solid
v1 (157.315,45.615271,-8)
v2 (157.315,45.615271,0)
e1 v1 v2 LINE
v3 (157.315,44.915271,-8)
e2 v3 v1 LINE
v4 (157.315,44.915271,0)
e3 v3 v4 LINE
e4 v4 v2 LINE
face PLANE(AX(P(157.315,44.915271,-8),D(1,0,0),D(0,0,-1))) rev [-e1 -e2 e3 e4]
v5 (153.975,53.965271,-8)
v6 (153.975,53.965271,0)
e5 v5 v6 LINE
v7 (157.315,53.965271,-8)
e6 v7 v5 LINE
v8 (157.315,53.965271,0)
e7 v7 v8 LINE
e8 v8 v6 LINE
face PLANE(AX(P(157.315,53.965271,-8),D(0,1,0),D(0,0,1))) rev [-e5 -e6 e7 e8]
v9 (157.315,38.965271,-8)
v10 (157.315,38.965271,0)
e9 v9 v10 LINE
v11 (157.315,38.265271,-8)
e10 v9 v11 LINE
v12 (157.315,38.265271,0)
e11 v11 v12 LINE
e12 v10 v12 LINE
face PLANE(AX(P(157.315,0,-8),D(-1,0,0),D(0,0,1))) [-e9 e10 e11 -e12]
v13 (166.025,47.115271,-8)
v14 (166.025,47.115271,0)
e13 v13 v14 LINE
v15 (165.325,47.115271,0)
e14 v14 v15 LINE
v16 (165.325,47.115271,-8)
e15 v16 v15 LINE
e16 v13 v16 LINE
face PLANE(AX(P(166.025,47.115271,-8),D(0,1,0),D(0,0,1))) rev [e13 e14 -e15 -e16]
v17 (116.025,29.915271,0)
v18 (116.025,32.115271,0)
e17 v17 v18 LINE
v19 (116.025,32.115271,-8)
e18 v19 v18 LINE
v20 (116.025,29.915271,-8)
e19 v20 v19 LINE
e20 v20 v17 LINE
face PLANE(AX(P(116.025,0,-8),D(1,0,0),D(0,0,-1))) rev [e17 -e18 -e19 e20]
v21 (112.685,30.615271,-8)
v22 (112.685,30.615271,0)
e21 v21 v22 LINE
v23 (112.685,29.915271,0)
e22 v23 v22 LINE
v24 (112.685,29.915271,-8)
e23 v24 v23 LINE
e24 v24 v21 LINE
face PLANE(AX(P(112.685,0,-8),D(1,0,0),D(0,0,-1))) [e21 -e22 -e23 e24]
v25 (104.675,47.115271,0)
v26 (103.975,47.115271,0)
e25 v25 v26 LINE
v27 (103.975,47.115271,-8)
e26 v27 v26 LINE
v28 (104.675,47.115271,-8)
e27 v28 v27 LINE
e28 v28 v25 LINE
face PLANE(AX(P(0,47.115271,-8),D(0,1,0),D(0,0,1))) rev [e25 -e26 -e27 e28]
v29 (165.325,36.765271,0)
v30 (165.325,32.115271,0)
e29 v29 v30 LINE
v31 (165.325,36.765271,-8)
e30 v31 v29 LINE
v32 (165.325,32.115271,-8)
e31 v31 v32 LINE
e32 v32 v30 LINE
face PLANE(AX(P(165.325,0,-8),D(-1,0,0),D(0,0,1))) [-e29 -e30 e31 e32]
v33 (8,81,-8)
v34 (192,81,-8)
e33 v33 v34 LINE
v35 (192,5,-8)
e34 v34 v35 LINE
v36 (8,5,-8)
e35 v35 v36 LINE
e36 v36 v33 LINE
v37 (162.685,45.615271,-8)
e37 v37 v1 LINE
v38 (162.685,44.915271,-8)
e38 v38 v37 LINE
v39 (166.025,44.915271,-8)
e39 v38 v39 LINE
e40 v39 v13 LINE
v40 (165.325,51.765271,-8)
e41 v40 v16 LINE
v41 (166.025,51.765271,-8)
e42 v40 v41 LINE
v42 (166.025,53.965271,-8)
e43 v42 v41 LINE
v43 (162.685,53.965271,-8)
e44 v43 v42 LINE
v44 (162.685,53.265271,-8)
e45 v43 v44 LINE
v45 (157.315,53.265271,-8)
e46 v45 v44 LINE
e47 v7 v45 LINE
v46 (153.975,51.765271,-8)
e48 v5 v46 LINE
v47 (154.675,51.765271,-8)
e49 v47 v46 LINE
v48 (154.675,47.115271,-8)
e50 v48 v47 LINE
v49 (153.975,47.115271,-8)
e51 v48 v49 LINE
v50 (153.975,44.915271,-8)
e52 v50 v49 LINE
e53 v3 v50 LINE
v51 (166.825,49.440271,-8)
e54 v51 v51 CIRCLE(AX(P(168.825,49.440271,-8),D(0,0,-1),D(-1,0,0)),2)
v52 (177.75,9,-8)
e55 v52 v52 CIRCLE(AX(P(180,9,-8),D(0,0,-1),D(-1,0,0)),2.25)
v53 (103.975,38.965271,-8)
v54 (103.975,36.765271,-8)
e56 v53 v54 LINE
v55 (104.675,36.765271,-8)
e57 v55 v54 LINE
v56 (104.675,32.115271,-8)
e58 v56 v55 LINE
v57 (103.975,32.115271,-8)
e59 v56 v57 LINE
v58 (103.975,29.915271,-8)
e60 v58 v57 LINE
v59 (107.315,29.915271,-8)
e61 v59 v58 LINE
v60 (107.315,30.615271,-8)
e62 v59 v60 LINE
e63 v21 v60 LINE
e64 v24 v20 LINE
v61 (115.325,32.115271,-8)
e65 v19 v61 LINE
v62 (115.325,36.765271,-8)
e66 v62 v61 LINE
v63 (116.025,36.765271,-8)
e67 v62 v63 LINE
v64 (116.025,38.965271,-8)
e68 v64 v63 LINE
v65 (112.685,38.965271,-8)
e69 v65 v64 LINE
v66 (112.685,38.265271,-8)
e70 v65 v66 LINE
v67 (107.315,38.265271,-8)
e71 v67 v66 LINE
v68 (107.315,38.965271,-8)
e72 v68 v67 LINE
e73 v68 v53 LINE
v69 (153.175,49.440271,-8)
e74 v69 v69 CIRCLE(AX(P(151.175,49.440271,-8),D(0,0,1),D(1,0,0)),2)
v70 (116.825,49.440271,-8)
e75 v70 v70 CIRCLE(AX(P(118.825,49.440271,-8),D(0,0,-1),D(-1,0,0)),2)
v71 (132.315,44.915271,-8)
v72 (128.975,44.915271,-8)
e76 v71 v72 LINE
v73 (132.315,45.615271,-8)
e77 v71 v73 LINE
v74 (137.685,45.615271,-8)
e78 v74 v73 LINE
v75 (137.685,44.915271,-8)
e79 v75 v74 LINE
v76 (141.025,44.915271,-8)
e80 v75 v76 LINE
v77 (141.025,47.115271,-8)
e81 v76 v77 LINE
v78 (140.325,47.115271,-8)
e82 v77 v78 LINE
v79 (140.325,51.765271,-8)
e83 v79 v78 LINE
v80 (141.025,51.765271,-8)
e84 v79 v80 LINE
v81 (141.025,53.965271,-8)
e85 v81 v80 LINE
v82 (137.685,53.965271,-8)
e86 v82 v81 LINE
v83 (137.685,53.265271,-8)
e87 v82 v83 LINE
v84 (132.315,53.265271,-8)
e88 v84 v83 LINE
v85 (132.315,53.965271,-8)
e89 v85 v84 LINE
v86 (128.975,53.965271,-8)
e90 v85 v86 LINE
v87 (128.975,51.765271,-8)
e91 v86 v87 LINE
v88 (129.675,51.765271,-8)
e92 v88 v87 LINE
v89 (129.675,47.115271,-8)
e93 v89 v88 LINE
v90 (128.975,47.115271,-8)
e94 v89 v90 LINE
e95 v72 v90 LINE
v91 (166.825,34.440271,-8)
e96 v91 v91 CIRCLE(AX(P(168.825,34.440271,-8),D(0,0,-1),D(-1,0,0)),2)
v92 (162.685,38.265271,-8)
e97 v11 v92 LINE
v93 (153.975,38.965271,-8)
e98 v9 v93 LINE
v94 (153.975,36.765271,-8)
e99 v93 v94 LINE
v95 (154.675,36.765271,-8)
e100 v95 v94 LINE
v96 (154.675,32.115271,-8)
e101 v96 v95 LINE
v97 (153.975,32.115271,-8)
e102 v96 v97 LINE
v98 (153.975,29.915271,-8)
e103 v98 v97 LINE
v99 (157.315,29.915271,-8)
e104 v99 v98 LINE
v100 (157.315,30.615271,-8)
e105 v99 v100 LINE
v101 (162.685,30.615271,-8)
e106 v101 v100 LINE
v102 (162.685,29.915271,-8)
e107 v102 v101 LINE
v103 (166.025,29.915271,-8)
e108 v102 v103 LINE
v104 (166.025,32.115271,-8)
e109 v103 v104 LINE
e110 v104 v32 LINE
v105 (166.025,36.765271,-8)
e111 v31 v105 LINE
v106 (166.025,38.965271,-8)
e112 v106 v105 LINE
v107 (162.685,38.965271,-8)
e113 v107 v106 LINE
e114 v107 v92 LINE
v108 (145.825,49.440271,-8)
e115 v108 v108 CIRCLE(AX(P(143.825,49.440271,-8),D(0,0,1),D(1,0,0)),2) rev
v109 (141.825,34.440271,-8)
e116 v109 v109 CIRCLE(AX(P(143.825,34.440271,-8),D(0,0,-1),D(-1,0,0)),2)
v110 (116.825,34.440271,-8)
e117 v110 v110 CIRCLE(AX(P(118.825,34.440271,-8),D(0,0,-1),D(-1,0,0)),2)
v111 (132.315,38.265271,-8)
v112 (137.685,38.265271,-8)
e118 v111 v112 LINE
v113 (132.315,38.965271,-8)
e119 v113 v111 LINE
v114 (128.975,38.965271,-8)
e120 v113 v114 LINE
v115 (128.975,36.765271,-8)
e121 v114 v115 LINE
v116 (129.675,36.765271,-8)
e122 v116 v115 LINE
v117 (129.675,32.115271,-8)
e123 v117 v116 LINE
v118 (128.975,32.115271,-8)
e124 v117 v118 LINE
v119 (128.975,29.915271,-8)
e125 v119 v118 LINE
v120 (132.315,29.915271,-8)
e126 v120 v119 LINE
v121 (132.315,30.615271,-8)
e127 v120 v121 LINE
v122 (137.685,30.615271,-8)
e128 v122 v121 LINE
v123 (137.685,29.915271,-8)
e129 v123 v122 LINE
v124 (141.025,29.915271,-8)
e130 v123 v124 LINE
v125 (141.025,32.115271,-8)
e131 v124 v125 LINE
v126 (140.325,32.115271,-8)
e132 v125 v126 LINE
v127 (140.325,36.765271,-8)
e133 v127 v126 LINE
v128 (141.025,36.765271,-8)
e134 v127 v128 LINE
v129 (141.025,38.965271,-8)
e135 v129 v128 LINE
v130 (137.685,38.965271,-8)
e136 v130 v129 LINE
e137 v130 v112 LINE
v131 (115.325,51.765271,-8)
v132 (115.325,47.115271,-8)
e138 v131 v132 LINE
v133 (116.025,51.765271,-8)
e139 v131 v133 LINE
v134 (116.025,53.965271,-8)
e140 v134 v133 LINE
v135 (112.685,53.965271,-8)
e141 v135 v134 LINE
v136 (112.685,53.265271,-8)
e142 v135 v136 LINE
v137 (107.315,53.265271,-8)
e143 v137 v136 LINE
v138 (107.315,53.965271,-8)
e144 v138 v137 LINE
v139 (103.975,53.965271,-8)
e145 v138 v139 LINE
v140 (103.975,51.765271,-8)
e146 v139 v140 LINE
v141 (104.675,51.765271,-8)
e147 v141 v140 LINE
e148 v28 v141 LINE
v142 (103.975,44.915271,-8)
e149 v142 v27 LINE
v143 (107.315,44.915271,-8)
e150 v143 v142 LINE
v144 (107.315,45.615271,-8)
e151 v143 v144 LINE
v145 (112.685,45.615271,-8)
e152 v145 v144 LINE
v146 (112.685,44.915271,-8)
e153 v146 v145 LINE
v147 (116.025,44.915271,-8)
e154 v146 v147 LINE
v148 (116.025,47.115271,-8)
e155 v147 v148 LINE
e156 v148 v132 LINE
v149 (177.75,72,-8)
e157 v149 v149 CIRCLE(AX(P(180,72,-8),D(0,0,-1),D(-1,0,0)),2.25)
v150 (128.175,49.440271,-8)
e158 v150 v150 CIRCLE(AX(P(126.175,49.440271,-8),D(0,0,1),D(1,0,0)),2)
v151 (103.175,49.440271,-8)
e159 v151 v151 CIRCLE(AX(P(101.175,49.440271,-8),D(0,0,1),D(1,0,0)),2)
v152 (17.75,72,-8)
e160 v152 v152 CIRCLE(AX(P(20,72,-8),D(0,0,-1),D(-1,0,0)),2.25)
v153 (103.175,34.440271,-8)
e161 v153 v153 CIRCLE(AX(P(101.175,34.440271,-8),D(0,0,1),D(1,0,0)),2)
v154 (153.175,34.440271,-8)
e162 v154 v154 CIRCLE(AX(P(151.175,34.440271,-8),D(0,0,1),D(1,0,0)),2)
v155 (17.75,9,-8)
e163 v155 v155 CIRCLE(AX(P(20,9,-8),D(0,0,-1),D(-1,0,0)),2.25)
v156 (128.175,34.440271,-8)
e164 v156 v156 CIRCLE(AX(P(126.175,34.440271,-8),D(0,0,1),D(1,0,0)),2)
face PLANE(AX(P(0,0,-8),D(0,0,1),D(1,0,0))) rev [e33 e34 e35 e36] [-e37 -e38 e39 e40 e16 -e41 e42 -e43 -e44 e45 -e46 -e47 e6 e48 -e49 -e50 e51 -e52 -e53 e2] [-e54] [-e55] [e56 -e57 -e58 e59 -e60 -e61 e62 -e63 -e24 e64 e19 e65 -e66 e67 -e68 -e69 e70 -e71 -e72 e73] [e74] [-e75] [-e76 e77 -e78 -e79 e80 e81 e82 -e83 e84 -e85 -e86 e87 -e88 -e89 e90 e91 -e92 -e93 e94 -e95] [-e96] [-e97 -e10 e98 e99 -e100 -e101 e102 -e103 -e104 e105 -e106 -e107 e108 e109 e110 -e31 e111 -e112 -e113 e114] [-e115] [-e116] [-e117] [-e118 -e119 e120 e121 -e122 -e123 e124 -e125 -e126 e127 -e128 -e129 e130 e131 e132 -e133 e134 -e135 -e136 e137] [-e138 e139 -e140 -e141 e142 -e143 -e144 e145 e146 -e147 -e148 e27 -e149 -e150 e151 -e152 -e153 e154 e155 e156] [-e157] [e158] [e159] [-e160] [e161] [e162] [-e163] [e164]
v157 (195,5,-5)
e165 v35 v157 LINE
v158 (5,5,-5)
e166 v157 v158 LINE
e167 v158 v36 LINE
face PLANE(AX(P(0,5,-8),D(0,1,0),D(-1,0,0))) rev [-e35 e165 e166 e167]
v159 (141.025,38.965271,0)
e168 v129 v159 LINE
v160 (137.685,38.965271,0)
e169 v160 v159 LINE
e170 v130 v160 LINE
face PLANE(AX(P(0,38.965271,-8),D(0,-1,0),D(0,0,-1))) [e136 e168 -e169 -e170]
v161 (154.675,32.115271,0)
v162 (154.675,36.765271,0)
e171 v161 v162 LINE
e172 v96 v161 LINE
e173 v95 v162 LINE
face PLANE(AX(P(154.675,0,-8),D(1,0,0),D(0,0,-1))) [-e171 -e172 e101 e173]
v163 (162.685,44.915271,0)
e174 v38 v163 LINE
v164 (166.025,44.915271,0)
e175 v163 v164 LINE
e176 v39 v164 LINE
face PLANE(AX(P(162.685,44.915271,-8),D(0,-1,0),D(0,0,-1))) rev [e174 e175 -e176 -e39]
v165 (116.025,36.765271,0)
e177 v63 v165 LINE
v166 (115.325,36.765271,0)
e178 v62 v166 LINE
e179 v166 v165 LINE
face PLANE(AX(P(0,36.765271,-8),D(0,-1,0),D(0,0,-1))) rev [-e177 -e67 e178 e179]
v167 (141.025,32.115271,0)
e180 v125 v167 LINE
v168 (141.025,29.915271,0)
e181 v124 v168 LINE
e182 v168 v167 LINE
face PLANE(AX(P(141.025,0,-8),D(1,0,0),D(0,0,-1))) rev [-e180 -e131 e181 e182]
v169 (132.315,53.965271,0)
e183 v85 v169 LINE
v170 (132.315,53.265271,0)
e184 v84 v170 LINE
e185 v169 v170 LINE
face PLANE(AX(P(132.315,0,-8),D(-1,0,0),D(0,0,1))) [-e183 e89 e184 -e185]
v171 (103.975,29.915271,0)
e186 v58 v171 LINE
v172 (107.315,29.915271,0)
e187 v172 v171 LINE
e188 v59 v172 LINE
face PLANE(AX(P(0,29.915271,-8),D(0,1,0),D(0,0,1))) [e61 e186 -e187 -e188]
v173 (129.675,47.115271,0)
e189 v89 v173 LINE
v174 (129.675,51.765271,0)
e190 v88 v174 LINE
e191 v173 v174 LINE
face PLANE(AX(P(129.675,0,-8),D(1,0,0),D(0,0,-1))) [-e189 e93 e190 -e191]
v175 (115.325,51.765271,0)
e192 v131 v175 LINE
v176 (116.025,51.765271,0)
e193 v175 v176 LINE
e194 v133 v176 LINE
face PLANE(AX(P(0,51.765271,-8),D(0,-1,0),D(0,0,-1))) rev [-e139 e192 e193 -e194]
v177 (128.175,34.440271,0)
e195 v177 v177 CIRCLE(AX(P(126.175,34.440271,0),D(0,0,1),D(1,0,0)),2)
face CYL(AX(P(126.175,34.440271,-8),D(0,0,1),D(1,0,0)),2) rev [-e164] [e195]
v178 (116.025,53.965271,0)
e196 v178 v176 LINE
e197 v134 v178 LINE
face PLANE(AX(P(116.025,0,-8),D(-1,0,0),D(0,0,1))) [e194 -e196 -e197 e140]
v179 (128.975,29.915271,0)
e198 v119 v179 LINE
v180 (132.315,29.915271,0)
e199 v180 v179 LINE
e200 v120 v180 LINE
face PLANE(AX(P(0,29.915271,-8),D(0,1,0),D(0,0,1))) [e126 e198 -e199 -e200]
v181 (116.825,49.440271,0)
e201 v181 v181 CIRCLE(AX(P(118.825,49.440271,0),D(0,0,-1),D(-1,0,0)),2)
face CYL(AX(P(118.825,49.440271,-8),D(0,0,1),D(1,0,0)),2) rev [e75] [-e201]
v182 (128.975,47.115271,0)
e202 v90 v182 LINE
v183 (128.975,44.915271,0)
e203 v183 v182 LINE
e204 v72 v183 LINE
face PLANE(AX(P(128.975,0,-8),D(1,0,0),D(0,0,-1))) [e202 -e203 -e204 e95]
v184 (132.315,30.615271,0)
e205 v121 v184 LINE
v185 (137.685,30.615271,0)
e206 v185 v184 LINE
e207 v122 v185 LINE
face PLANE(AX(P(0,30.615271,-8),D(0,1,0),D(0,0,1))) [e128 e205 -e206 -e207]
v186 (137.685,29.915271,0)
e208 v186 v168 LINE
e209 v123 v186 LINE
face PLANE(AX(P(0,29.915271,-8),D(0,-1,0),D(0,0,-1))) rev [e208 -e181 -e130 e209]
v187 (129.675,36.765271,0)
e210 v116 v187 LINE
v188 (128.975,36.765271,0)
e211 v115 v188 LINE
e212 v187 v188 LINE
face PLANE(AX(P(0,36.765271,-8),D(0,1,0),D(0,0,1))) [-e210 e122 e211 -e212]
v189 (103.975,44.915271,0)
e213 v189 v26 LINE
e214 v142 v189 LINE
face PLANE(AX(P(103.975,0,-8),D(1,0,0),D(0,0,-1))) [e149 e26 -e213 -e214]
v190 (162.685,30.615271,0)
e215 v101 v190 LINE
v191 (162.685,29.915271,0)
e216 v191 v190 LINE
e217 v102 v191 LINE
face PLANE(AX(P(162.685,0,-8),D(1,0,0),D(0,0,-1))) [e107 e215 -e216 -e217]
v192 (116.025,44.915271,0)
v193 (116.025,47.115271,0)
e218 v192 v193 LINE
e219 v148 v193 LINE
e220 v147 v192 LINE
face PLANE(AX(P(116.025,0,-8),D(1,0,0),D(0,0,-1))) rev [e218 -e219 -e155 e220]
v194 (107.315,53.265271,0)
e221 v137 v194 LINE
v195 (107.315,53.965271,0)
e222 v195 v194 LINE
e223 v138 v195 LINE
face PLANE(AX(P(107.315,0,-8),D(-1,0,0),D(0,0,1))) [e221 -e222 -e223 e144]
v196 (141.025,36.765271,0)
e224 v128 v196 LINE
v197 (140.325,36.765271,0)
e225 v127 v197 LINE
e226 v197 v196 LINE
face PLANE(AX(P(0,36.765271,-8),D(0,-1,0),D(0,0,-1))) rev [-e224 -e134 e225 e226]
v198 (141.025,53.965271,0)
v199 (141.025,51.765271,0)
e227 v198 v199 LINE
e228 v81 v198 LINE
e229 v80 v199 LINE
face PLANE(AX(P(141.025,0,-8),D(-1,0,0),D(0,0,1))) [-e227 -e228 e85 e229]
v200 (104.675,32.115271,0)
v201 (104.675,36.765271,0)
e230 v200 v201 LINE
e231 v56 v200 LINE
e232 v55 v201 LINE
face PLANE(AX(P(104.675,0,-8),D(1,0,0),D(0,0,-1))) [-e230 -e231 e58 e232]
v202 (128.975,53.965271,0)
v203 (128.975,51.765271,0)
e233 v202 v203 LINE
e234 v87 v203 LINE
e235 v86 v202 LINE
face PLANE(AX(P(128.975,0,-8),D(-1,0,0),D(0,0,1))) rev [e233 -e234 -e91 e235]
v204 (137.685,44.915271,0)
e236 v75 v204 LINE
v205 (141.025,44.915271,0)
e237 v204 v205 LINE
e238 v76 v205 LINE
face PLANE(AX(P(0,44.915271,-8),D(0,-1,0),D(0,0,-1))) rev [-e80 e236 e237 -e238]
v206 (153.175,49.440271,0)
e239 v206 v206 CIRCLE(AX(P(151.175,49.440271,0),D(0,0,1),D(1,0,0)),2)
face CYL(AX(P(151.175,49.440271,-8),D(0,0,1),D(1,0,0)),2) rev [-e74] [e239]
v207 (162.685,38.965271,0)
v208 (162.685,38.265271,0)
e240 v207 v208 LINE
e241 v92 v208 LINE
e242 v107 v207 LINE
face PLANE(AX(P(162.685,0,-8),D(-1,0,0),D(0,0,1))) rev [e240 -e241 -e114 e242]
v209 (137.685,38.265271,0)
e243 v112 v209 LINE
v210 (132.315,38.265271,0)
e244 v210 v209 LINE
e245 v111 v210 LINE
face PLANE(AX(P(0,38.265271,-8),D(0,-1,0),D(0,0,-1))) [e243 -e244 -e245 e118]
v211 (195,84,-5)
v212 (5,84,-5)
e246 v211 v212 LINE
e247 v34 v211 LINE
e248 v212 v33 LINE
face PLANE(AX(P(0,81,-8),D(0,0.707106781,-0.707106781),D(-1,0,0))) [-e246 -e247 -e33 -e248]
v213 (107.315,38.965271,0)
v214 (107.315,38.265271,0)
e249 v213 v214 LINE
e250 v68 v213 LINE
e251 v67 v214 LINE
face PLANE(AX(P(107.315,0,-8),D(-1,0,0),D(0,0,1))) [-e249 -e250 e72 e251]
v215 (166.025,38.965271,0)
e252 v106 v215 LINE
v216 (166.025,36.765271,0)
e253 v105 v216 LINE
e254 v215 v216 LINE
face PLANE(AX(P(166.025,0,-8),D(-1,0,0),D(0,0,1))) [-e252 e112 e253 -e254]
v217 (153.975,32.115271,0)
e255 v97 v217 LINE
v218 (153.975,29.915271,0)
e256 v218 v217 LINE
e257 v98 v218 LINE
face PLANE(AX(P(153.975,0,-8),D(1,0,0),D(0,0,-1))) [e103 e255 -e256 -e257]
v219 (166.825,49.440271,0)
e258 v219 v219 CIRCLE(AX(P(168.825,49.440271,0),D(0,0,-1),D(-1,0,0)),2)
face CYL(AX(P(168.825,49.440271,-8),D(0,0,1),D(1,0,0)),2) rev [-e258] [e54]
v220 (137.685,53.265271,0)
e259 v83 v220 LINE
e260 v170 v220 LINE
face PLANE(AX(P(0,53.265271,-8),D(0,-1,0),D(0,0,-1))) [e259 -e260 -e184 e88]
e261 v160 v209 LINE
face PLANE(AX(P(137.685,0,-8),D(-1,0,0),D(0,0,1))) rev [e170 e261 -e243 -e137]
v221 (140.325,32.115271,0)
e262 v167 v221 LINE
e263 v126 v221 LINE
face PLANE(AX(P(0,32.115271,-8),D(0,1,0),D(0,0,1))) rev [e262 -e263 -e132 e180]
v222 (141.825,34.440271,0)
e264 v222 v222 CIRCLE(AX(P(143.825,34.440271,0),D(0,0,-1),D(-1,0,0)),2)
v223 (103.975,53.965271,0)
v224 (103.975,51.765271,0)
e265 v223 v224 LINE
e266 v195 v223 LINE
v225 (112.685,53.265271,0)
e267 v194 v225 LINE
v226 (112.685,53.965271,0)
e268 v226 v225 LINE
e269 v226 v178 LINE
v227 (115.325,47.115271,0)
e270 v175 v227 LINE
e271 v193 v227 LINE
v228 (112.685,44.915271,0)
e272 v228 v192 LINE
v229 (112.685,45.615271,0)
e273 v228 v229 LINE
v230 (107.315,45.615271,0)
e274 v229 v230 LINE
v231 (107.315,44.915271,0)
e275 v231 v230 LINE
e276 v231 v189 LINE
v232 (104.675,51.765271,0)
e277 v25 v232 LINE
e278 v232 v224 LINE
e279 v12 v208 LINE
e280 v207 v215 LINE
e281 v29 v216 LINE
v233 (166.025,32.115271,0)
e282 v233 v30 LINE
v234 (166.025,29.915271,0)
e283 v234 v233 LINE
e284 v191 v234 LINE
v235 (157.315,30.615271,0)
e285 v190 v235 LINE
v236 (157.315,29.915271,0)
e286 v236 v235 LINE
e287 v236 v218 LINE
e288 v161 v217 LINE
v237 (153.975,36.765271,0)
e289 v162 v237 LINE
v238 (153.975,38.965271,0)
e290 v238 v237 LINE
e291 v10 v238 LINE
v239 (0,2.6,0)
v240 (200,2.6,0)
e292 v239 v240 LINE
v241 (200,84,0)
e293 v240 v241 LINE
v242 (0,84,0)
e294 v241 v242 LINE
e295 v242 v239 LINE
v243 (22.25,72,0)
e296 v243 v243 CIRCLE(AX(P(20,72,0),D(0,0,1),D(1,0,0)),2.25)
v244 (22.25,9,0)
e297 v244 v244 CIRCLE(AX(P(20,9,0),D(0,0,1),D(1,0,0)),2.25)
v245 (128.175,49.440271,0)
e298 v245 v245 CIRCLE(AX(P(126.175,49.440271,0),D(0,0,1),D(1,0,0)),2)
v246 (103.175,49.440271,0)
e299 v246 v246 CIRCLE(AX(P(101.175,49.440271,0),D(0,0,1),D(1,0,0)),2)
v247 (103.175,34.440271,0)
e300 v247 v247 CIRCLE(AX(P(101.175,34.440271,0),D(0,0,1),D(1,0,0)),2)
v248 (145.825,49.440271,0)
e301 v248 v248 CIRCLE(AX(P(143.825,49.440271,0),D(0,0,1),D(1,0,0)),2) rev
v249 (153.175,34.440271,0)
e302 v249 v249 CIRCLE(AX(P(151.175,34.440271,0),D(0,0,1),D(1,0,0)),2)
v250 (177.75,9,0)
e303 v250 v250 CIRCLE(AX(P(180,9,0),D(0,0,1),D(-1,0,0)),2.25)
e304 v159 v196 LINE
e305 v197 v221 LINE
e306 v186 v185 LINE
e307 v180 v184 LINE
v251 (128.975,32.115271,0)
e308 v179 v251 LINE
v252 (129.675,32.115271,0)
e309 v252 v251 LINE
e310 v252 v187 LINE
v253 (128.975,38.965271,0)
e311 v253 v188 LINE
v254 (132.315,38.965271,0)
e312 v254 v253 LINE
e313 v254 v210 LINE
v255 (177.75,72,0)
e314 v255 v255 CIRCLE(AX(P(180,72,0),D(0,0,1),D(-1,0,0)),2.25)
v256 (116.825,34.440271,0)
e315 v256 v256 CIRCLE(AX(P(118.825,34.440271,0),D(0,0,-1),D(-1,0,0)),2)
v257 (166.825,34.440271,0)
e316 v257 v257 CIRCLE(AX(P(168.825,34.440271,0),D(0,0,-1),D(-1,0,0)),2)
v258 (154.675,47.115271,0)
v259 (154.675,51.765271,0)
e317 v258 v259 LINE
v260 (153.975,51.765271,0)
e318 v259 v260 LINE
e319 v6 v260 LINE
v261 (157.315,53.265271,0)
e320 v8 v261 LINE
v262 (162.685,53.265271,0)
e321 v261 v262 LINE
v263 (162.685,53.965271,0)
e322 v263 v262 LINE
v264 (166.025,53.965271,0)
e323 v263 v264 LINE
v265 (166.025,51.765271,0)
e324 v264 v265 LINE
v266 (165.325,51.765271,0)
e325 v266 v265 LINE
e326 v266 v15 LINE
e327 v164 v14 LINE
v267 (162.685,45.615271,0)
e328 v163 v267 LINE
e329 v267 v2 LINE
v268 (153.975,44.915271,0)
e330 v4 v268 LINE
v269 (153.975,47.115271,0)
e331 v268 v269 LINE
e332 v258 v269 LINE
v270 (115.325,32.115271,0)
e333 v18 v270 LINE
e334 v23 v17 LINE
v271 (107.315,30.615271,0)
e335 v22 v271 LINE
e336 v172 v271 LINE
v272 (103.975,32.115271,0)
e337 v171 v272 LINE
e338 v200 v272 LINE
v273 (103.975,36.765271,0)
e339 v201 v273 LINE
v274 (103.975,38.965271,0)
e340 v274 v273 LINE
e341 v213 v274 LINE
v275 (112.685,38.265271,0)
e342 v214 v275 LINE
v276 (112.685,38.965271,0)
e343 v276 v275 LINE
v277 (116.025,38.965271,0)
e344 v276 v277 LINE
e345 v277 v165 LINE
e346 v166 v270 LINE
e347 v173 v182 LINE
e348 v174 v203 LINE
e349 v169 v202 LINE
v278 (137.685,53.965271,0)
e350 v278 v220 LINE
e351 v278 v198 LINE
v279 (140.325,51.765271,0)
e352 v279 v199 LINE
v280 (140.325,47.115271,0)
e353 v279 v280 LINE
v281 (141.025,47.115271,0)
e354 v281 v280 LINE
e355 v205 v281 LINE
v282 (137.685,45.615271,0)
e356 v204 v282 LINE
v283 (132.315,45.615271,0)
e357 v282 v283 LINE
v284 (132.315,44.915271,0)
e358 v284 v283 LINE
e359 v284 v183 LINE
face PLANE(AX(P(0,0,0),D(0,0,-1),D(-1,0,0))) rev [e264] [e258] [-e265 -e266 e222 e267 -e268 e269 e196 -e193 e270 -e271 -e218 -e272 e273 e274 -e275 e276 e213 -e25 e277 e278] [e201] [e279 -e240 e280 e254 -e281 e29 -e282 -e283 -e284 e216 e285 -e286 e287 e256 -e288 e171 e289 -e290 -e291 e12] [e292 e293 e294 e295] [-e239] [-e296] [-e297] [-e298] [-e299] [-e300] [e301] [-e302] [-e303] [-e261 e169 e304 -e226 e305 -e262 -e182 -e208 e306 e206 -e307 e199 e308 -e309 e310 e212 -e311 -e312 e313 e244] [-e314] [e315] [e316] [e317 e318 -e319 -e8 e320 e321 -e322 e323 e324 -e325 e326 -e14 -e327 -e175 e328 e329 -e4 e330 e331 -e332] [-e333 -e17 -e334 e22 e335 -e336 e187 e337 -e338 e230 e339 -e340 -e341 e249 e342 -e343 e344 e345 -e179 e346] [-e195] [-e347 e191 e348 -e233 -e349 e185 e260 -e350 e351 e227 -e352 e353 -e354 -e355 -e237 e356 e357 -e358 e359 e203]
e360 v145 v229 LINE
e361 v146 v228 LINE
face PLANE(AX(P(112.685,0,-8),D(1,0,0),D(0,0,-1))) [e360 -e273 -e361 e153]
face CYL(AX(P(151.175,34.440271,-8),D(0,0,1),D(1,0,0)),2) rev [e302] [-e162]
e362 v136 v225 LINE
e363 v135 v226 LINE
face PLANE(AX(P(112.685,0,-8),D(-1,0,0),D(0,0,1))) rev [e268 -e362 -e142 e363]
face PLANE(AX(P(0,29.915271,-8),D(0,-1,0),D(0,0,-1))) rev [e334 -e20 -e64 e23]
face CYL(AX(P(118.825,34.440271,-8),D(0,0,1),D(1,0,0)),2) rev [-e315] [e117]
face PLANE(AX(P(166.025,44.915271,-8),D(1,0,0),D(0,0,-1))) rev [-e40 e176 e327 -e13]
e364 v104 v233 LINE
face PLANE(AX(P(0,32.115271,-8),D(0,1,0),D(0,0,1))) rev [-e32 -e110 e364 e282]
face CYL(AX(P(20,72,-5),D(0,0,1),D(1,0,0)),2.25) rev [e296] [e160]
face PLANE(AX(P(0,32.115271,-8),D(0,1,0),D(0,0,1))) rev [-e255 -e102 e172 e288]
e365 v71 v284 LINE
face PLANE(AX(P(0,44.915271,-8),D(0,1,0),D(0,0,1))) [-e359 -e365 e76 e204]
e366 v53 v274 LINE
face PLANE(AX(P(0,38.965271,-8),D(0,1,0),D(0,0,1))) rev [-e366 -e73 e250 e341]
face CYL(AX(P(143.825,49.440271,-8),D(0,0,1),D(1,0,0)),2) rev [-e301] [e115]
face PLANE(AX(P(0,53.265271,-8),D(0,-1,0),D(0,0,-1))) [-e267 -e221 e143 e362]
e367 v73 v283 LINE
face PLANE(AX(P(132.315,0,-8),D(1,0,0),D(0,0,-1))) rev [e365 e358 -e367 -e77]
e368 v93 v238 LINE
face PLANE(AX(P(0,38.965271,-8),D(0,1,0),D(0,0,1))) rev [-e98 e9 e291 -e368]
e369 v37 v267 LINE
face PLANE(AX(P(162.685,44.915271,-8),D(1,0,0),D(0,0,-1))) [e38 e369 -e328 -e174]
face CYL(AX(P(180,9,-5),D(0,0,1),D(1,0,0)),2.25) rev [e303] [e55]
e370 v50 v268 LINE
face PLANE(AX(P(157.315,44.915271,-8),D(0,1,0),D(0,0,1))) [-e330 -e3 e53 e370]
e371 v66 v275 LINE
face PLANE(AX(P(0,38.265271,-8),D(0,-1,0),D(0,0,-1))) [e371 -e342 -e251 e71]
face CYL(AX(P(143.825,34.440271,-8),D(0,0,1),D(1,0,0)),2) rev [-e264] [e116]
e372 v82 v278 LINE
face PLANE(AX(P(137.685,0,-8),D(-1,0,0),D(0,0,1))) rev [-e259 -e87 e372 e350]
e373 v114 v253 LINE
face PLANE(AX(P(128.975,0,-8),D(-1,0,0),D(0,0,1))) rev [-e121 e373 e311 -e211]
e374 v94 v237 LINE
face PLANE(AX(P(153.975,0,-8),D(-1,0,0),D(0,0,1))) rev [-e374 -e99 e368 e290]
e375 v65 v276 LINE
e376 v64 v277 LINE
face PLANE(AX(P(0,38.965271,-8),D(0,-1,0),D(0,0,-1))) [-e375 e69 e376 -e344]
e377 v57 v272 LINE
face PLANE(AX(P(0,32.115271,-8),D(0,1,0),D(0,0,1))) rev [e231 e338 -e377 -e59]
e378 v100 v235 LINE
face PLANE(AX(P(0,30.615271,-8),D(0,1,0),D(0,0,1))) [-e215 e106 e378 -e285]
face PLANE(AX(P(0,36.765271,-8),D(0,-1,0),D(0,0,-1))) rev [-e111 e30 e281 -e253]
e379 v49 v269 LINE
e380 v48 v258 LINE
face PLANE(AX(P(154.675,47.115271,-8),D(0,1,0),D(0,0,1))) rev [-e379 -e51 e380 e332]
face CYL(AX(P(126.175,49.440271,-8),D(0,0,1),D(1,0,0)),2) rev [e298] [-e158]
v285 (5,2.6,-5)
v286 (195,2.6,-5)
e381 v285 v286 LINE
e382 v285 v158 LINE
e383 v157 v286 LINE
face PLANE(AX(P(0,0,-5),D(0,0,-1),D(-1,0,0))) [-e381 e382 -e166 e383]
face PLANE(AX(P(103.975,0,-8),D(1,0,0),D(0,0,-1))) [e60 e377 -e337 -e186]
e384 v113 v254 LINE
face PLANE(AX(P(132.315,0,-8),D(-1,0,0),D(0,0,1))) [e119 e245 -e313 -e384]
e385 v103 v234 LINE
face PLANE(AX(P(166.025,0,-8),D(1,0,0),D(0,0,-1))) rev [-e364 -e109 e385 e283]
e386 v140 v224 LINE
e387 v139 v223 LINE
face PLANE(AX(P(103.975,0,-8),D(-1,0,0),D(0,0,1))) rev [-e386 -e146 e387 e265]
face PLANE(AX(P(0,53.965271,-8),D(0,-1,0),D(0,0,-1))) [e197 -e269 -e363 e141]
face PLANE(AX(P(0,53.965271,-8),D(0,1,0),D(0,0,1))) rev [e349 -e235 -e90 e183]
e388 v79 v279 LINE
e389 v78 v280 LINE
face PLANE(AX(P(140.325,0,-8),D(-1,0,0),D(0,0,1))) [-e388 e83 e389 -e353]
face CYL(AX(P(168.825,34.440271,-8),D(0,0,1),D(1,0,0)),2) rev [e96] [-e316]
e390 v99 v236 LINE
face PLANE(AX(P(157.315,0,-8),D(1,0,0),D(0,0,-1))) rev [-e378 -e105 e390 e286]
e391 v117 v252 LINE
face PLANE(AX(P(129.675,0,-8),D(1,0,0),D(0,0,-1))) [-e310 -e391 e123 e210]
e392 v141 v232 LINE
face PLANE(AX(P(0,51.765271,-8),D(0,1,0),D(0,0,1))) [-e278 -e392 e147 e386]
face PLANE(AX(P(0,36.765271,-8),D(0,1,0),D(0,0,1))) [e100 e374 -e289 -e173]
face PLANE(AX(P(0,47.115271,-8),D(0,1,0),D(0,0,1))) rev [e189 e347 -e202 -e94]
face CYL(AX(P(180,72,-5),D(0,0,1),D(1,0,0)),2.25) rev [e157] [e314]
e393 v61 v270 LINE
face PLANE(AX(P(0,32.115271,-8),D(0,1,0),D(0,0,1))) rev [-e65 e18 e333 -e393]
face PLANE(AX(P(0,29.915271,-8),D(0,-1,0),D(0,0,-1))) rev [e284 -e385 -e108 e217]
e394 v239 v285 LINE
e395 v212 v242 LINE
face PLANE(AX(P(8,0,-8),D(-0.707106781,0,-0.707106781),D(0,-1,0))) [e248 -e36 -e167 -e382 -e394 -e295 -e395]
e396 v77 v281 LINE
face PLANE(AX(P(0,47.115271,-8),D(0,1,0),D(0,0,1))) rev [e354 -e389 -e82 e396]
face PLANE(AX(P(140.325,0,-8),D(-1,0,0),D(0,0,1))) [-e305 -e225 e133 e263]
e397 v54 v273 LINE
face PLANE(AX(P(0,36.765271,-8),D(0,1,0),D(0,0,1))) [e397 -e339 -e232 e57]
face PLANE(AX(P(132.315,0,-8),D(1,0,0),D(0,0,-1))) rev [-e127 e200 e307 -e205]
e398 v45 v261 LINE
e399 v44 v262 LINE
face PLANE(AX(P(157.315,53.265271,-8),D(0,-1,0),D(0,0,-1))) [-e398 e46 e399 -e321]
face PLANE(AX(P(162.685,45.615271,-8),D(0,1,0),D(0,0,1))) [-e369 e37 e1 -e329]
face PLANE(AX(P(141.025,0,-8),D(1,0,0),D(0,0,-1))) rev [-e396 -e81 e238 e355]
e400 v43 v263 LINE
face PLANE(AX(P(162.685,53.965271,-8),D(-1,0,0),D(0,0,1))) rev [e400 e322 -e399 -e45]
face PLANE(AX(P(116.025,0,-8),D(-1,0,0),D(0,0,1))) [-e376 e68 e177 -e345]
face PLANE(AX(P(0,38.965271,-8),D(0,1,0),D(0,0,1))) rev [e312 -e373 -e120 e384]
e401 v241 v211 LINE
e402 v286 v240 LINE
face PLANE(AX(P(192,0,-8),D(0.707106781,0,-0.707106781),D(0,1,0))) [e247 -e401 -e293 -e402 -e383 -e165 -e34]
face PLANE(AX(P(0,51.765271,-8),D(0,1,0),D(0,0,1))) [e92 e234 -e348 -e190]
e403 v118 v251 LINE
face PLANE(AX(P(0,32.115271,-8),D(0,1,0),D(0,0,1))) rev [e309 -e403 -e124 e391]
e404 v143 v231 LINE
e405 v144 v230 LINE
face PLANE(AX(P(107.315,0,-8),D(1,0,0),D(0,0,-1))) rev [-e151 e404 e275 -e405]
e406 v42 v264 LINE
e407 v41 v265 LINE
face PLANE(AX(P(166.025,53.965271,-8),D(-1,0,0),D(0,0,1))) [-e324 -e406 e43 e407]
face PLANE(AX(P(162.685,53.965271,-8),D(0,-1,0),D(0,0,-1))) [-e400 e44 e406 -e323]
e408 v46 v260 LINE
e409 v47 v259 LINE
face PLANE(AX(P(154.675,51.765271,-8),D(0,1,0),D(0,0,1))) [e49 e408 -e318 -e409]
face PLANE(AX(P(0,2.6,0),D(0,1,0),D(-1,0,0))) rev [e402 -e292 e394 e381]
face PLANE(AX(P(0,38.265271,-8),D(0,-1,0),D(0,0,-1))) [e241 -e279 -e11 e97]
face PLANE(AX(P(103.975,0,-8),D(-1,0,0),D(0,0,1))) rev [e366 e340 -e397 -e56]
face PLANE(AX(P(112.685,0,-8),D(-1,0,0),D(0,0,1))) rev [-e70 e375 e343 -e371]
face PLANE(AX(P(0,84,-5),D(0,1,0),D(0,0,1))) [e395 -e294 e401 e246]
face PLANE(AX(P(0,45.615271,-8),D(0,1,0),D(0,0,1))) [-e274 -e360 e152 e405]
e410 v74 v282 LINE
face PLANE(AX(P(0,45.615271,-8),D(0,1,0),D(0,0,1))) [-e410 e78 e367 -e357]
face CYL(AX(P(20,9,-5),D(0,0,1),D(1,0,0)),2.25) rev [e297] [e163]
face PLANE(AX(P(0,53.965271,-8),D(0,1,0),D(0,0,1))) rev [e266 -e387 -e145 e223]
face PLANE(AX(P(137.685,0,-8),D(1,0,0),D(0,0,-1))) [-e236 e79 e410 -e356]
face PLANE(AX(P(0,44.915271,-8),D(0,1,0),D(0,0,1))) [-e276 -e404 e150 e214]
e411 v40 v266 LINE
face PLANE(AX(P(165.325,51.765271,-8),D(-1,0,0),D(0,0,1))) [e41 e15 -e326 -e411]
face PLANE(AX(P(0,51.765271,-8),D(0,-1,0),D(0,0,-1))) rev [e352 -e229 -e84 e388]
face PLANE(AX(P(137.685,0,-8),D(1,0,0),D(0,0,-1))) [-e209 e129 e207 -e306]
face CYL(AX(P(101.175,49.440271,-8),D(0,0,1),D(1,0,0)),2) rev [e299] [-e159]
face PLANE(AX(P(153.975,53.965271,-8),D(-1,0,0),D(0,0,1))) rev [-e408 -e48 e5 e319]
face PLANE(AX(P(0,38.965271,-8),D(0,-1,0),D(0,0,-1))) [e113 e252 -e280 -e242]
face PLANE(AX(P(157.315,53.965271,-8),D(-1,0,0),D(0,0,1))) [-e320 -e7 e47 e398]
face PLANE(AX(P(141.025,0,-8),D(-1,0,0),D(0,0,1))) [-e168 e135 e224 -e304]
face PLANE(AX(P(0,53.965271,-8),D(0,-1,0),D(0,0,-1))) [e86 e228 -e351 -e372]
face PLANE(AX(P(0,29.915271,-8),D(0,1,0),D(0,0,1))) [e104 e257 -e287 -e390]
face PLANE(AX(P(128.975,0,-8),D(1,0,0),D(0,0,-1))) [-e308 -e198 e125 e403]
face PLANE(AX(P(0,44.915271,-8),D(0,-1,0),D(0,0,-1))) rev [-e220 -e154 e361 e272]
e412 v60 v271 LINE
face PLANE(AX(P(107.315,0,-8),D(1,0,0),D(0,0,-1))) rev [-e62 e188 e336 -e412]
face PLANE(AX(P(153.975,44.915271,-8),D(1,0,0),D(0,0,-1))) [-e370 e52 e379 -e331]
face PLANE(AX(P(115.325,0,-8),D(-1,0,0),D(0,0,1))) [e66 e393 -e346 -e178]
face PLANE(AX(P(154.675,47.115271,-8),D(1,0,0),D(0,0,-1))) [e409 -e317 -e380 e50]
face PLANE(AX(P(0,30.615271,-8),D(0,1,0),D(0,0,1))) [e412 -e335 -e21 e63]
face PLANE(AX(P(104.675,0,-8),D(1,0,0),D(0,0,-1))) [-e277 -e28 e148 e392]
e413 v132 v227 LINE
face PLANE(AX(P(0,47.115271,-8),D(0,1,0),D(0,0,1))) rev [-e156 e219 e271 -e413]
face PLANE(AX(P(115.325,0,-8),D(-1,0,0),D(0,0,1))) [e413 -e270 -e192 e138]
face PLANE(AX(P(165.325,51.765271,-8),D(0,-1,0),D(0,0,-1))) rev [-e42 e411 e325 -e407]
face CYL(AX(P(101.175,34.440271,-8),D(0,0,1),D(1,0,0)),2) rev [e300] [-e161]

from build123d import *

# Parameters (mm, degrees)
SKETCH1_W           = 200
SKETCH1_H           = 84
SKETCH1_R           = 2.25
BOSS_EXTRUDE1_DEPTH = 5
SKETCH2_W           = 200
SKETCH2_H           = 79
SKETCH2_R           = 2.25
BOSS_EXTRUDE2_DEPTH = 3
CHAMFER1_SIZE       = 8
CHAMFER3_SIZE       = 3
SKETCH3_W           = 7.071067812
SKETCH3_H           = 2.6
CUT_EXTRUDE1_DEPTH  = 234.034075139
SKETCH4_R           = 2
CUT_EXTRUDE3_DEPTH  = 218.071416819


with BuildPart() as part:
    # Sketch1 → Boss-Extrude1 (new body)
    with BuildSketch(Plane.XY):
        with Locations((100, 42)):
            Rectangle(SKETCH1_W, SKETCH1_H)
        with Locations((20, 9)):
            Circle(SKETCH1_R, mode=Mode.SUBTRACT)
        with Locations(Location((180, 9, 0), (0, 0, 180))):
            Circle(SKETCH1_R, mode=Mode.SUBTRACT)
        with Locations((20, 72)):
            Circle(SKETCH1_R, mode=Mode.SUBTRACT)
        with Locations(Location((180, 72, 0), (0, 0, 180))):
            Circle(SKETCH1_R, mode=Mode.SUBTRACT)
    extrude(amount=-BOSS_EXTRUDE1_DEPTH)

    # Sketch2 → Boss-Extrude2 (add)
    with BuildSketch(Plane(origin=(0, 0, -5), x_dir=(-1, 0, 0), z_dir=(0, 0, -1))):
        with Locations((-100, 44.5)):
            Rectangle(SKETCH2_W, SKETCH2_H)
        with Locations(Location((-20, 9, 0), (0, 0, 180))):
            Circle(SKETCH2_R, mode=Mode.SUBTRACT)
        with Locations((-180, 9)):
            Circle(SKETCH2_R, mode=Mode.SUBTRACT)
        with Locations(Location((-20, 72, 0), (0, 0, 180))):
            Circle(SKETCH2_R, mode=Mode.SUBTRACT)
        with Locations((-180, 72)):
            Circle(SKETCH2_R, mode=Mode.SUBTRACT)
    extrude(amount=BOSS_EXTRUDE2_DEPTH)

    # Chamfer1
    # the kernel refuses this chamfer: 8 mm, written as the material it takes off along each edge
    with BuildSketch(Plane(origin=(200, -15.573463904, -8), x_dir=(-0.9996219169112968, 0, -0.027495876610586296), z_dir=(0, 1, 0)), Plane(origin=(0, 104.573463904, -8), x_dir=(0.9996219169112968, 0, -0.027495876610586275), z_dir=(0, -1, 0))) as chamfer1_piece_1:
        Polygon((CHAMFER1_SIZE * 0.999621916911, CHAMFER1_SIZE * 0.0274958766106), (-CHAMFER1_SIZE * 0.0274958766106, CHAMFER1_SIZE * 0.999621916911), (0, 0), align=None)
    extrude(amount=120.146927807, mode=Mode.SUBTRACT)

    # Chamfer3
    chamfer3_edges = [part.edges().sort_by_distance(p)[0] for p in [
        (100, 84, -8),
    ]]
    chamfer(chamfer3_edges, length=CHAMFER3_SIZE)

    # Sketch3 → Cut-Extrude1 (cut, through all, along a direction that is not the sketch's normal)
    with BuildSketch(Plane(origin=(100, 0, -100), x_dir=(-0.7071067811865452, 0, -0.7071067811865498), z_dir=(0.7071067811865498, 0, -0.7071067811865452))):
        with Locations((-137.885822331, 1.3)):
            Rectangle(SKETCH3_W, SKETCH3_H)
    extrude(amount=-CUT_EXTRUDE1_DEPTH, dir=(1, 0, 0), mode=Mode.SUBTRACT)

    # Sketch4 → Cut-Extrude3 (cut, through all)
    with BuildSketch(Plane.XY):
        Polygon((165.325, 32.115271452), (165.325, 36.765271452), (166.025, 36.765271452), (166.025, 38.965271452), (162.685, 38.965271452), (162.685, 38.265271452), (157.315, 38.265271452), (157.315, 38.965271452), (153.975, 38.965271452), (153.975, 36.765271452), (154.675, 36.765271452), (154.675, 32.115271452), (153.975, 32.115271452), (153.975, 29.915271452), (157.315, 29.915271452), (157.315, 30.615271452), (162.685, 30.615271452), (162.685, 29.915271452), (166.025, 29.915271452), (166.025, 32.115271452), align=None)
        Polygon((140.325, 32.115271452), (140.325, 36.765271452), (141.025, 36.765271452), (141.025, 38.965271452), (137.685, 38.965271452), (137.685, 38.265271452), (132.315, 38.265271452), (132.315, 38.965271452), (128.975, 38.965271452), (128.975, 36.765271452), (129.675, 36.765271452), (129.675, 32.115271452), (128.975, 32.115271452), (128.975, 29.915271452), (132.315, 29.915271452), (132.315, 30.615271452), (137.685, 30.615271452), (137.685, 29.915271452), (141.025, 29.915271452), (141.025, 32.115271452), align=None)
        Polygon((115.325, 32.115271452), (115.325, 36.765271452), (116.025, 36.765271452), (116.025, 38.965271452), (112.685, 38.965271452), (112.685, 38.265271452), (107.315, 38.265271452), (107.315, 38.965271452), (103.975, 38.965271452), (103.975, 36.765271452), (104.675, 36.765271452), (104.675, 32.115271452), (103.975, 32.115271452), (103.975, 29.915271452), (107.315, 29.915271452), (107.315, 30.615271452), (112.685, 30.615271452), (112.685, 29.915271452), (116.025, 29.915271452), (116.025, 32.115271452), align=None)
        Polygon((140.325, 47.115271452), (140.325, 51.765271452), (141.025, 51.765271452), (141.025, 53.965271452), (137.685, 53.965271452), (137.685, 53.265271452), (132.315, 53.265271452), (132.315, 53.965271452), (128.975, 53.965271452), (128.975, 51.765271452), (129.675, 51.765271452), (129.675, 47.115271452), (128.975, 47.115271452), (128.975, 44.915271452), (132.315, 44.915271452), (132.315, 45.615271452), (137.685, 45.615271452), (137.685, 44.915271452), (141.025, 44.915271452), (141.025, 47.115271452), align=None)
        Polygon((115.325, 47.115271452), (115.325, 51.765271452), (116.025, 51.765271452), (116.025, 53.965271452), (112.685, 53.965271452), (112.685, 53.265271452), (107.315, 53.265271452), (107.315, 53.965271452), (103.975, 53.965271452), (103.975, 51.765271452), (104.675, 51.765271452), (104.675, 47.115271452), (103.975, 47.115271452), (103.975, 44.915271452), (107.315, 44.915271452), (107.315, 45.615271452), (112.685, 45.615271452), (112.685, 44.915271452), (116.025, 44.915271452), (116.025, 47.115271452), align=None)
        Polygon((165.325, 47.115271452), (165.325, 51.765271452), (166.025, 51.765271452), (166.025, 53.965271452), (162.685, 53.965271452), (162.685, 53.265271452), (157.315, 53.265271452), (157.315, 53.965271452), (153.975, 53.965271452), (153.975, 51.765271452), (154.675, 51.765271452), (154.675, 47.115271452), (153.975, 47.115271452), (153.975, 44.915271452), (157.315, 44.915271452), (157.315, 45.615271452), (162.685, 45.615271452), (162.685, 44.915271452), (166.025, 44.915271452), (166.025, 47.115271452), align=None)
        with Locations((151.175, 34.440271452)):
            Circle(SKETCH4_R)
        with Locations(Location((168.825, 34.440271452, 0), (0, 0, 180))):
            Circle(SKETCH4_R)
        with Locations((126.175, 34.440271452)):
            Circle(SKETCH4_R)
        with Locations(Location((143.825, 34.440271452, 0), (0, 0, 180))):
            Circle(SKETCH4_R)
        with Locations((101.175, 34.440271452)):
            Circle(SKETCH4_R)
        with Locations(Location((118.825, 34.440271452, 0), (0, 0, 180))):
            Circle(SKETCH4_R)
        with Locations((126.175, 49.440271452)):
            Circle(SKETCH4_R)
        with Locations((143.825, 49.440271452)):
            Circle(SKETCH4_R)
        with Locations((101.175, 49.440271452)):
            Circle(SKETCH4_R)
        with Locations(Location((118.825, 49.440271452, 0), (0, 0, 180))):
            Circle(SKETCH4_R)
        with Locations((151.175, 49.440271452)):
            Circle(SKETCH4_R)
        with Locations(Location((168.825, 49.440271452, 0), (0, 0, 180))):
            Circle(SKETCH4_R)
    extrude(amount=-CUT_EXTRUDE3_DEPTH, mode=Mode.SUBTRACT)


solid = part.part
